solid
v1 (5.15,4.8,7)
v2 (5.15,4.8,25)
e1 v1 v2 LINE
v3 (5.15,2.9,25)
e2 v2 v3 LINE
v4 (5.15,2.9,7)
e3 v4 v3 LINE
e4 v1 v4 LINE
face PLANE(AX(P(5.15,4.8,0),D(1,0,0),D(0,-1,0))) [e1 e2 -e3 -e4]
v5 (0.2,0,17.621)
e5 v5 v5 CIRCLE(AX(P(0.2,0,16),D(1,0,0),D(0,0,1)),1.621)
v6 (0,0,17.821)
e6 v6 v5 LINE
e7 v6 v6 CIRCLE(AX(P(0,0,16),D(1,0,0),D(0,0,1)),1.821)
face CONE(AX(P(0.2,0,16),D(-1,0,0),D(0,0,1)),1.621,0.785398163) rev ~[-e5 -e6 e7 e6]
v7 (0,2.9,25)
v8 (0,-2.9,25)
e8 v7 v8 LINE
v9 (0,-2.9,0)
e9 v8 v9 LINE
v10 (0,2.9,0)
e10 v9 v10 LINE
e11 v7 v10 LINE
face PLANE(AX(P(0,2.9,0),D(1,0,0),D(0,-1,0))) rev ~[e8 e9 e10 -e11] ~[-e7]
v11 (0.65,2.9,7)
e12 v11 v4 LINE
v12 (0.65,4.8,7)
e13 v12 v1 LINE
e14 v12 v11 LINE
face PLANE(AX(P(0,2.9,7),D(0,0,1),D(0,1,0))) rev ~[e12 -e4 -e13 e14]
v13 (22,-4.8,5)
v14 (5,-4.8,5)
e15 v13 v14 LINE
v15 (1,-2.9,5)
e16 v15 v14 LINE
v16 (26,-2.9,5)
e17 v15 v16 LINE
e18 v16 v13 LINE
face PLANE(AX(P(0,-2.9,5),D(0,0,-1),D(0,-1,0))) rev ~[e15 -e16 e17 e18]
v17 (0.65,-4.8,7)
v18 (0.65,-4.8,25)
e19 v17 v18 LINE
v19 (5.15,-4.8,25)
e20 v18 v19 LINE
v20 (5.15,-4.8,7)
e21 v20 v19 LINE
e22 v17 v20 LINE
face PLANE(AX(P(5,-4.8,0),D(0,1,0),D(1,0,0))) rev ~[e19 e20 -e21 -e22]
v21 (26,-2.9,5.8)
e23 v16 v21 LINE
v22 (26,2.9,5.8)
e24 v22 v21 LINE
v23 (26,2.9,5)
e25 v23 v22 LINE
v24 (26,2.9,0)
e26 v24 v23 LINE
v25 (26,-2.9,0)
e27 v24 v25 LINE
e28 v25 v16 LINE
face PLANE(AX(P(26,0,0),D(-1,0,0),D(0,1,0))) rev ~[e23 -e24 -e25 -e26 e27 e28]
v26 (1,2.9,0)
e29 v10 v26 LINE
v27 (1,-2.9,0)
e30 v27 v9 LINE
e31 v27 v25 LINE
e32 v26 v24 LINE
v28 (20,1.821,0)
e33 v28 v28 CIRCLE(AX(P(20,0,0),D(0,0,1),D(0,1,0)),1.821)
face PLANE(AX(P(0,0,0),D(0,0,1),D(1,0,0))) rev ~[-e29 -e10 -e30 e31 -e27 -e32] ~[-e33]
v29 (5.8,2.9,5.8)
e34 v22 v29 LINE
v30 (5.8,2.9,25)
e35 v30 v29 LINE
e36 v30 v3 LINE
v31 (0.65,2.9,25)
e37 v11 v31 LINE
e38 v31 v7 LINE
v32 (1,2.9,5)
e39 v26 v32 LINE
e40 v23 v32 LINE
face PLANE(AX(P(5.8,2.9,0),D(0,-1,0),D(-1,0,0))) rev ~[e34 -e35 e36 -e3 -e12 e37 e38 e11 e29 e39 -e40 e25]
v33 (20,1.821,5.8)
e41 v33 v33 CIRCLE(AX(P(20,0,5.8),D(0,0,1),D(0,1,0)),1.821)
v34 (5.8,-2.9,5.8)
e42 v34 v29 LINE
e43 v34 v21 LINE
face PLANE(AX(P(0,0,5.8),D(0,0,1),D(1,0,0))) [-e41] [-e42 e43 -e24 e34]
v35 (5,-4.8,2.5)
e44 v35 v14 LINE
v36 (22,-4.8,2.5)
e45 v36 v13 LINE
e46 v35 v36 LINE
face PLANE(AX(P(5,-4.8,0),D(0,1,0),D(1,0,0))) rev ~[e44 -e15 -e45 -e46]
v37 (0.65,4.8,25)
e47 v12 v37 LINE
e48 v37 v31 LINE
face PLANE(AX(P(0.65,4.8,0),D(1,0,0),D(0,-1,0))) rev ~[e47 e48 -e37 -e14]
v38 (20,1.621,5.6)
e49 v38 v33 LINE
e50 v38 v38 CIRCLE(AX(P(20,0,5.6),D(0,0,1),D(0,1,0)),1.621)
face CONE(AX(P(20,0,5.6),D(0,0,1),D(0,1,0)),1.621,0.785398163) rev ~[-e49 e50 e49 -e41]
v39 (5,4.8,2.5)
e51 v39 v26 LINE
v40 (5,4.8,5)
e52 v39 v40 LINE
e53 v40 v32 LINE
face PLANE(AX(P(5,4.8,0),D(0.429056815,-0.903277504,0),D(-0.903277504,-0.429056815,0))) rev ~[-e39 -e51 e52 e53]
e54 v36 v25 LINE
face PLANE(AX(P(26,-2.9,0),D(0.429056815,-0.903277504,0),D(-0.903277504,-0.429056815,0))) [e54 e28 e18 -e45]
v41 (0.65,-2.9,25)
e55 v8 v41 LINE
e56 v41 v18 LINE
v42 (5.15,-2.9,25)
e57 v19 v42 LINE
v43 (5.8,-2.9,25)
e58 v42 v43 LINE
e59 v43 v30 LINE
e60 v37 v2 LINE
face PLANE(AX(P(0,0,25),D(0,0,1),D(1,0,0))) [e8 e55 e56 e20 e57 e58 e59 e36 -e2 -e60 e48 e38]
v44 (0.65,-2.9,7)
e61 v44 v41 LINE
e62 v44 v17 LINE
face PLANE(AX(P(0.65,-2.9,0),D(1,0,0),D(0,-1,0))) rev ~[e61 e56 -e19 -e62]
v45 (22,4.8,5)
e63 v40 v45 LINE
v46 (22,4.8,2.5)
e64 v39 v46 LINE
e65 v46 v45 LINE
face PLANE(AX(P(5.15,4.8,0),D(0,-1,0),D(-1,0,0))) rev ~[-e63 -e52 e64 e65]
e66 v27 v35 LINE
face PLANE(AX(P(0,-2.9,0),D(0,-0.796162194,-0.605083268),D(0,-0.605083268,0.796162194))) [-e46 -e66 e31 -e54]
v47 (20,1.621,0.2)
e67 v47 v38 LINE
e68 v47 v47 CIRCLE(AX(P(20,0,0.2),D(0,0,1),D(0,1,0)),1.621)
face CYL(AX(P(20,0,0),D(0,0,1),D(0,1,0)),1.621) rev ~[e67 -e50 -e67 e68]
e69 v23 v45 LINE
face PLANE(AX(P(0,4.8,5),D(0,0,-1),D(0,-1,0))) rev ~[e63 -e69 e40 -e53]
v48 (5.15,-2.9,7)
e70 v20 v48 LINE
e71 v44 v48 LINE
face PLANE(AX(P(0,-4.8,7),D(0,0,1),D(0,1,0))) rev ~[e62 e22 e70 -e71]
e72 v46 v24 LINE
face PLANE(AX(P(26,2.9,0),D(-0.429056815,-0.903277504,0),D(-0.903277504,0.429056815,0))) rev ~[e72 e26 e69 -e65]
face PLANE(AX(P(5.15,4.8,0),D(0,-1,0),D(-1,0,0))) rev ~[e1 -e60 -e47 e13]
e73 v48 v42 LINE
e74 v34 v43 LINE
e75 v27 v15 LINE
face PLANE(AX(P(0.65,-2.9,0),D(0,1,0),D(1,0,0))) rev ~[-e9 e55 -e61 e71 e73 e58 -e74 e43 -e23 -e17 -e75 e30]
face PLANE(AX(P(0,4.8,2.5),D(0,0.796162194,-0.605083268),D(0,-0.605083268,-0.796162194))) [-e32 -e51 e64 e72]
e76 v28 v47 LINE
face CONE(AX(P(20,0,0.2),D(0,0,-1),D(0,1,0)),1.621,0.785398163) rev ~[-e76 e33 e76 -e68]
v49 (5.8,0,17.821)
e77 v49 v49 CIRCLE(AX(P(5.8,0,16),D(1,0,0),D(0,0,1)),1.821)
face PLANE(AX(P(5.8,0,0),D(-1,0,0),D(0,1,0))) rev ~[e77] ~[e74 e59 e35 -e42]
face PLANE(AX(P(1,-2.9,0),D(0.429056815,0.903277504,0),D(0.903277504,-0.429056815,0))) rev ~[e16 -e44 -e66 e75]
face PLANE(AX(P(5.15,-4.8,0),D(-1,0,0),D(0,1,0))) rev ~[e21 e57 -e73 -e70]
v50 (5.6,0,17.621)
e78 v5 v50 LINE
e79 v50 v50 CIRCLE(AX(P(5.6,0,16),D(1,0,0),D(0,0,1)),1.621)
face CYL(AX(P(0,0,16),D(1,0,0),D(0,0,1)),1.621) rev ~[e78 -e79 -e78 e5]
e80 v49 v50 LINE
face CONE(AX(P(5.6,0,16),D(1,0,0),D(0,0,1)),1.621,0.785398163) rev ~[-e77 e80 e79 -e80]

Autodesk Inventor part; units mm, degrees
ref_plane "YZ Plane" through (0, 0, 0) normal (1, 0, 0) x (0, 1, 0)
ref_plane "XZ Plane" through (0, 0, 0) normal (0, 1, 0) x (-1, 0, 0)
ref_plane "XY Plane" through (0, 0, 0) normal (0, 0, 1) x (1, 0, 0)
sketch "Skizze3" plane through (0, 0, 0) normal (1, 0, 0) x (0, 1, 0)
  line L0 (4.8, 5) -> (-4.8, 5)
  line L1 (2.9, 5) -> (2.9, 25)
  line L2 (2.9, 25) -> (-2.9, 25)
  line L3 (-2.9, 25) -> (-2.9, 5)
  line L4 (-2.9, 25) -> (-4.8, 25)
  line L5 (-4.8, 25) -> (-4.8, 7)
  line L6 (-4.8, 7) -> (-2.9, 7)
  line L7 (2.9, 7) -> (4.8, 7)
  line L8 (4.8, 7) -> (4.8, 25)
  line L9 (4.8, 25) -> (2.9, 25)
  line L10 (0, -5) -> (0, 30) projected
  line L11 (4.8, 5) -> (4.8, 2.5)
  line L12 (-2.9, 0) -> (-4.8, 2.5)
  line L13 (-4.8, 2.5) -> (-4.8, 5)
  line L14 (4.8, 2.5) -> (2.9, 0)
  line L15 (2.9, 0) -> (-2.9, 0)
  line L16 (-6.72, 0) -> (6.72, 0) projected
  line L17 (-2.9, 0) -> (-4.8, 0)
  line L18 (-4.8, 2.5) -> (-4.8, 0)
  line L19 (4.8, 2.5) -> (4.8, 0)
  line L20 (4.8, 0) -> (2.9, 0)
  line L21 (4.8, 5) -> (4.8, 7)
  line L22 (-4.8, 5) -> (-4.8, 7)
  point P0 (0, 0)
  point P1 (0, 25)
  point P2 (0, 5)
  point P3 (0, 0)
  point P4 (0, 16)
  dimension "d5" = 9.6
  dimension "d6" = 5.8
  dimension "d7" = 1.9
  dimension "d9" = 18
  dimension "d10" = 18
  dimension "d12" = 9.6
  dimension "d14" = 2.9
  dimension "d15" = 2.5
  dimension "d16" = 5.8
  dimension "d17" = 2.5
  dimension "d18" = 5
  dimension "d19" = 25
  dimension "d40" = 9
sketch "Skizze4" plane through (0, 0, 0) normal (0, 1, 0) x (-1, 0, 0)
  line L0 (0, 25) -> (0, 7) projected
  line L1 (0, 2.5) -> (0, 5) projected
  line L2 (0, 0) -> (0, 25)
  line L3 (0, 25) -> (-5.8, 25)
  line L4 (-5.8, 25) -> (-5.8, 5.8)
  line L5 (-5.8, 5.8) -> (-26, 5.8)
  line L6 (-26, 5.8) -> (-26, 0)
  line L7 (-26, 0) -> (0, 0)
  line L8 (-0.65, 25) -> (-0.65, 7)
  line L9 (-0.65, 7) -> (-5.15, 7)
  line L10 (-5.15, 7) -> (-5.15, 25)
  line L11 (-1, 0) -> (-1, 5)
  line L12 (-1, 5) -> (-26, 5)
  line L13 (-1, 0) -> (-5, 2.5)
  line L14 (-5, 2.5) -> (-22, 2.5)
  line L15 (-22, 2.5) -> (-26, 0)
  line L16 (-22, 2.5) -> (-22, 5)
  line L17 (-5, 2.5) -> (-5, 5)
  point P0 (0, 0)
  point P1 (0, 0)
  dimension "d20" = 5.8
  dimension "d21" = 4.5
  dimension "d22" = 0.65
  dimension "d23" = 26
  dimension "d24" = 5.8
  dimension "d25" = 25
  dimension "d26" = 4
  dimension "d27" = 4
sketch "Skizze5" plane through (0, 0, 0) normal (0, 0, 1) x (1, 0, 0)
  line L0 (5.15, 4.8) -> (0.65, 4.8)
  line L1 (0.65, 4.8) -> (0.65, 2.9)
  line L2 (0.65, 2.9) -> (0, 2.9)
  line L3 (0, 2.9) -> (0, -2.9)
  line L4 (0, -2.9) -> (0.65, -2.9)
  line L5 (0.65, -2.9) -> (0.65, -4.8)
  line L6 (0.65, -4.8) -> (5.15, -4.8)
  line L7 (5.15, -4.8) -> (5.15, -2.9)
  line L8 (5.15, -2.9) -> (5.8, -2.9)
  line L9 (5.8, -2.9) -> (5.8, 2.9)
  line L10 (5.8, 2.9) -> (5.15, 2.9)
  line L11 (5.15, 4.8) -> (5.15, 2.9)
  line L12 (0, -2.9) -> (26, -2.9)
  line L13 (26, -2.9) -> (26, 2.9)
  line L14 (26, 2.9) -> (0, 2.9)
  line L15 (26, -2.9) -> (22, -4.8)
  line L16 (22, -4.8) -> (5, -4.8)
  line L17 (1, -2.9) -> (5, -4.8)
  line L18 (22, -7.8717) -> (22, 8.228) construction
  line L19 (5, -6.3703) -> (5, 8.228) construction
  line L20 (1, -9.3021) -> (1, 6.7781) construction
  line L21 (26, 2.9) -> (22, 4.8)
  line L22 (5, 4.8) -> (1, 2.9)
  line L23 (5, 4.8) -> (22, 4.8)
  line L24 (26, 0) -> (0, 0) projected
  point P0 (5.8, 0)
  point P1 (5.15, 0)
  point P2 (0.65, 0)
  point P3 (0, 4.8)
  point P4 (0, -4.8)
  point P5 (1, 0)
  point P6 (1, 0)
  point P7 (1, 0)
  point P8 (5, 0)
  point P9 (5, 0)
  point P10 (5, 0)
  point P11 (22, 0)
  point P12 (22, 0)
  point P13 (22, 0)
  point P14 (26, 0)
  point P15 (26, 0)
  point P16 (20, 0)
  dimension "d41" = 6
extrude "Extrusion6" add sketch "Skizze5" along normal blind 25 contours L11 L14 L22 L0 | L22 L14 L1 L0 | L10 L9 L24 L3 L2 L14 | L9 L8 L12 L4 L3 L24 | L7 L6 L17 L12 | L17 L6 L5 L12
extrude "Extrusion7" cut sketch "Skizze3" along normal through all contours L0 L1 L7 L21 | L0 L22 L6 L3
extrude "Extrusion3" add sketch "Skizze5" along normal blind 5 separate body contours L11 L14 L22 L0 | L23 L21 L14 L10 L11 | L10 L9 L24 L3 L2 L14 | L14 L13 L24 L9 | L24 L13 L12 L9 | L9 L8 L12 L4 L3 L24 | L12 L15 L16 L7 L8 | L7 L6 L17 L12
extrude "Extrusion5" add sketch "Skizze5" along normal blind 5.8 contours L14 L13 L24 L9 | L24 L13 L12 L9
extrude "Extrusion4" cut sketch "Skizze3" along normal through all contours L19 L16 L14 | L16 L18 L12
extrude "Extrusion8" cut sketch "Skizze5" along normal up to surface (5 mm away) contours L22 L14 L1 L0 | L17 L6 L5 L12
hole "Bohrung1" at (20, 0, 0) direction (0, 0, 1) diameter 3.242 end through all thread size "M4x0.7" class "6H" standard "ISO Metric profile"
hole "Bohrung2" at (0, 0, 16) direction (1, 0, 0) diameter 3.242 end through all thread size "M4x0.7" class "6H" standard "ISO Metric profile"
chamfer "Fase1" distance 0.2 angle 45 4 edges at (0, 0, 14.379) (5.8, 0, 14.379) (20, -1.621, 5.8) (20, -1.621, 0)
equation "\"d5\" = H2"
equation "\"d6\" = H1"
equation "\"d7\" = -0.5 * d6 + 0.5 * d5"
equation "\"d12\" = d5"
equation "\"d14\" = 0.5 * d16"
equation "\"d19\" = L2"
equation "\"d20\" = G2"
equation "\"d21\" = G1"
equation "\"d22\" = -0.5 * d21 + 0.5 * d20"
equation "\"d23\" = L1"
equation "\"d24\" = G2"
equation "\"d34\" = L2"
equation "\"d32\" = d24"
equation "\"d38\" = L2"
equation "\"L1\" = 26"
equation "\"L2\" = 25"
equation "\"H1\" = 5.8"
equation "\"H2\" = 9.6"
equation "\"G1\" = 4.5"
equation "\"G2\" = 5.8"
equation "\"M\" = 4"
properties part number "BT000_trajan20_21"
